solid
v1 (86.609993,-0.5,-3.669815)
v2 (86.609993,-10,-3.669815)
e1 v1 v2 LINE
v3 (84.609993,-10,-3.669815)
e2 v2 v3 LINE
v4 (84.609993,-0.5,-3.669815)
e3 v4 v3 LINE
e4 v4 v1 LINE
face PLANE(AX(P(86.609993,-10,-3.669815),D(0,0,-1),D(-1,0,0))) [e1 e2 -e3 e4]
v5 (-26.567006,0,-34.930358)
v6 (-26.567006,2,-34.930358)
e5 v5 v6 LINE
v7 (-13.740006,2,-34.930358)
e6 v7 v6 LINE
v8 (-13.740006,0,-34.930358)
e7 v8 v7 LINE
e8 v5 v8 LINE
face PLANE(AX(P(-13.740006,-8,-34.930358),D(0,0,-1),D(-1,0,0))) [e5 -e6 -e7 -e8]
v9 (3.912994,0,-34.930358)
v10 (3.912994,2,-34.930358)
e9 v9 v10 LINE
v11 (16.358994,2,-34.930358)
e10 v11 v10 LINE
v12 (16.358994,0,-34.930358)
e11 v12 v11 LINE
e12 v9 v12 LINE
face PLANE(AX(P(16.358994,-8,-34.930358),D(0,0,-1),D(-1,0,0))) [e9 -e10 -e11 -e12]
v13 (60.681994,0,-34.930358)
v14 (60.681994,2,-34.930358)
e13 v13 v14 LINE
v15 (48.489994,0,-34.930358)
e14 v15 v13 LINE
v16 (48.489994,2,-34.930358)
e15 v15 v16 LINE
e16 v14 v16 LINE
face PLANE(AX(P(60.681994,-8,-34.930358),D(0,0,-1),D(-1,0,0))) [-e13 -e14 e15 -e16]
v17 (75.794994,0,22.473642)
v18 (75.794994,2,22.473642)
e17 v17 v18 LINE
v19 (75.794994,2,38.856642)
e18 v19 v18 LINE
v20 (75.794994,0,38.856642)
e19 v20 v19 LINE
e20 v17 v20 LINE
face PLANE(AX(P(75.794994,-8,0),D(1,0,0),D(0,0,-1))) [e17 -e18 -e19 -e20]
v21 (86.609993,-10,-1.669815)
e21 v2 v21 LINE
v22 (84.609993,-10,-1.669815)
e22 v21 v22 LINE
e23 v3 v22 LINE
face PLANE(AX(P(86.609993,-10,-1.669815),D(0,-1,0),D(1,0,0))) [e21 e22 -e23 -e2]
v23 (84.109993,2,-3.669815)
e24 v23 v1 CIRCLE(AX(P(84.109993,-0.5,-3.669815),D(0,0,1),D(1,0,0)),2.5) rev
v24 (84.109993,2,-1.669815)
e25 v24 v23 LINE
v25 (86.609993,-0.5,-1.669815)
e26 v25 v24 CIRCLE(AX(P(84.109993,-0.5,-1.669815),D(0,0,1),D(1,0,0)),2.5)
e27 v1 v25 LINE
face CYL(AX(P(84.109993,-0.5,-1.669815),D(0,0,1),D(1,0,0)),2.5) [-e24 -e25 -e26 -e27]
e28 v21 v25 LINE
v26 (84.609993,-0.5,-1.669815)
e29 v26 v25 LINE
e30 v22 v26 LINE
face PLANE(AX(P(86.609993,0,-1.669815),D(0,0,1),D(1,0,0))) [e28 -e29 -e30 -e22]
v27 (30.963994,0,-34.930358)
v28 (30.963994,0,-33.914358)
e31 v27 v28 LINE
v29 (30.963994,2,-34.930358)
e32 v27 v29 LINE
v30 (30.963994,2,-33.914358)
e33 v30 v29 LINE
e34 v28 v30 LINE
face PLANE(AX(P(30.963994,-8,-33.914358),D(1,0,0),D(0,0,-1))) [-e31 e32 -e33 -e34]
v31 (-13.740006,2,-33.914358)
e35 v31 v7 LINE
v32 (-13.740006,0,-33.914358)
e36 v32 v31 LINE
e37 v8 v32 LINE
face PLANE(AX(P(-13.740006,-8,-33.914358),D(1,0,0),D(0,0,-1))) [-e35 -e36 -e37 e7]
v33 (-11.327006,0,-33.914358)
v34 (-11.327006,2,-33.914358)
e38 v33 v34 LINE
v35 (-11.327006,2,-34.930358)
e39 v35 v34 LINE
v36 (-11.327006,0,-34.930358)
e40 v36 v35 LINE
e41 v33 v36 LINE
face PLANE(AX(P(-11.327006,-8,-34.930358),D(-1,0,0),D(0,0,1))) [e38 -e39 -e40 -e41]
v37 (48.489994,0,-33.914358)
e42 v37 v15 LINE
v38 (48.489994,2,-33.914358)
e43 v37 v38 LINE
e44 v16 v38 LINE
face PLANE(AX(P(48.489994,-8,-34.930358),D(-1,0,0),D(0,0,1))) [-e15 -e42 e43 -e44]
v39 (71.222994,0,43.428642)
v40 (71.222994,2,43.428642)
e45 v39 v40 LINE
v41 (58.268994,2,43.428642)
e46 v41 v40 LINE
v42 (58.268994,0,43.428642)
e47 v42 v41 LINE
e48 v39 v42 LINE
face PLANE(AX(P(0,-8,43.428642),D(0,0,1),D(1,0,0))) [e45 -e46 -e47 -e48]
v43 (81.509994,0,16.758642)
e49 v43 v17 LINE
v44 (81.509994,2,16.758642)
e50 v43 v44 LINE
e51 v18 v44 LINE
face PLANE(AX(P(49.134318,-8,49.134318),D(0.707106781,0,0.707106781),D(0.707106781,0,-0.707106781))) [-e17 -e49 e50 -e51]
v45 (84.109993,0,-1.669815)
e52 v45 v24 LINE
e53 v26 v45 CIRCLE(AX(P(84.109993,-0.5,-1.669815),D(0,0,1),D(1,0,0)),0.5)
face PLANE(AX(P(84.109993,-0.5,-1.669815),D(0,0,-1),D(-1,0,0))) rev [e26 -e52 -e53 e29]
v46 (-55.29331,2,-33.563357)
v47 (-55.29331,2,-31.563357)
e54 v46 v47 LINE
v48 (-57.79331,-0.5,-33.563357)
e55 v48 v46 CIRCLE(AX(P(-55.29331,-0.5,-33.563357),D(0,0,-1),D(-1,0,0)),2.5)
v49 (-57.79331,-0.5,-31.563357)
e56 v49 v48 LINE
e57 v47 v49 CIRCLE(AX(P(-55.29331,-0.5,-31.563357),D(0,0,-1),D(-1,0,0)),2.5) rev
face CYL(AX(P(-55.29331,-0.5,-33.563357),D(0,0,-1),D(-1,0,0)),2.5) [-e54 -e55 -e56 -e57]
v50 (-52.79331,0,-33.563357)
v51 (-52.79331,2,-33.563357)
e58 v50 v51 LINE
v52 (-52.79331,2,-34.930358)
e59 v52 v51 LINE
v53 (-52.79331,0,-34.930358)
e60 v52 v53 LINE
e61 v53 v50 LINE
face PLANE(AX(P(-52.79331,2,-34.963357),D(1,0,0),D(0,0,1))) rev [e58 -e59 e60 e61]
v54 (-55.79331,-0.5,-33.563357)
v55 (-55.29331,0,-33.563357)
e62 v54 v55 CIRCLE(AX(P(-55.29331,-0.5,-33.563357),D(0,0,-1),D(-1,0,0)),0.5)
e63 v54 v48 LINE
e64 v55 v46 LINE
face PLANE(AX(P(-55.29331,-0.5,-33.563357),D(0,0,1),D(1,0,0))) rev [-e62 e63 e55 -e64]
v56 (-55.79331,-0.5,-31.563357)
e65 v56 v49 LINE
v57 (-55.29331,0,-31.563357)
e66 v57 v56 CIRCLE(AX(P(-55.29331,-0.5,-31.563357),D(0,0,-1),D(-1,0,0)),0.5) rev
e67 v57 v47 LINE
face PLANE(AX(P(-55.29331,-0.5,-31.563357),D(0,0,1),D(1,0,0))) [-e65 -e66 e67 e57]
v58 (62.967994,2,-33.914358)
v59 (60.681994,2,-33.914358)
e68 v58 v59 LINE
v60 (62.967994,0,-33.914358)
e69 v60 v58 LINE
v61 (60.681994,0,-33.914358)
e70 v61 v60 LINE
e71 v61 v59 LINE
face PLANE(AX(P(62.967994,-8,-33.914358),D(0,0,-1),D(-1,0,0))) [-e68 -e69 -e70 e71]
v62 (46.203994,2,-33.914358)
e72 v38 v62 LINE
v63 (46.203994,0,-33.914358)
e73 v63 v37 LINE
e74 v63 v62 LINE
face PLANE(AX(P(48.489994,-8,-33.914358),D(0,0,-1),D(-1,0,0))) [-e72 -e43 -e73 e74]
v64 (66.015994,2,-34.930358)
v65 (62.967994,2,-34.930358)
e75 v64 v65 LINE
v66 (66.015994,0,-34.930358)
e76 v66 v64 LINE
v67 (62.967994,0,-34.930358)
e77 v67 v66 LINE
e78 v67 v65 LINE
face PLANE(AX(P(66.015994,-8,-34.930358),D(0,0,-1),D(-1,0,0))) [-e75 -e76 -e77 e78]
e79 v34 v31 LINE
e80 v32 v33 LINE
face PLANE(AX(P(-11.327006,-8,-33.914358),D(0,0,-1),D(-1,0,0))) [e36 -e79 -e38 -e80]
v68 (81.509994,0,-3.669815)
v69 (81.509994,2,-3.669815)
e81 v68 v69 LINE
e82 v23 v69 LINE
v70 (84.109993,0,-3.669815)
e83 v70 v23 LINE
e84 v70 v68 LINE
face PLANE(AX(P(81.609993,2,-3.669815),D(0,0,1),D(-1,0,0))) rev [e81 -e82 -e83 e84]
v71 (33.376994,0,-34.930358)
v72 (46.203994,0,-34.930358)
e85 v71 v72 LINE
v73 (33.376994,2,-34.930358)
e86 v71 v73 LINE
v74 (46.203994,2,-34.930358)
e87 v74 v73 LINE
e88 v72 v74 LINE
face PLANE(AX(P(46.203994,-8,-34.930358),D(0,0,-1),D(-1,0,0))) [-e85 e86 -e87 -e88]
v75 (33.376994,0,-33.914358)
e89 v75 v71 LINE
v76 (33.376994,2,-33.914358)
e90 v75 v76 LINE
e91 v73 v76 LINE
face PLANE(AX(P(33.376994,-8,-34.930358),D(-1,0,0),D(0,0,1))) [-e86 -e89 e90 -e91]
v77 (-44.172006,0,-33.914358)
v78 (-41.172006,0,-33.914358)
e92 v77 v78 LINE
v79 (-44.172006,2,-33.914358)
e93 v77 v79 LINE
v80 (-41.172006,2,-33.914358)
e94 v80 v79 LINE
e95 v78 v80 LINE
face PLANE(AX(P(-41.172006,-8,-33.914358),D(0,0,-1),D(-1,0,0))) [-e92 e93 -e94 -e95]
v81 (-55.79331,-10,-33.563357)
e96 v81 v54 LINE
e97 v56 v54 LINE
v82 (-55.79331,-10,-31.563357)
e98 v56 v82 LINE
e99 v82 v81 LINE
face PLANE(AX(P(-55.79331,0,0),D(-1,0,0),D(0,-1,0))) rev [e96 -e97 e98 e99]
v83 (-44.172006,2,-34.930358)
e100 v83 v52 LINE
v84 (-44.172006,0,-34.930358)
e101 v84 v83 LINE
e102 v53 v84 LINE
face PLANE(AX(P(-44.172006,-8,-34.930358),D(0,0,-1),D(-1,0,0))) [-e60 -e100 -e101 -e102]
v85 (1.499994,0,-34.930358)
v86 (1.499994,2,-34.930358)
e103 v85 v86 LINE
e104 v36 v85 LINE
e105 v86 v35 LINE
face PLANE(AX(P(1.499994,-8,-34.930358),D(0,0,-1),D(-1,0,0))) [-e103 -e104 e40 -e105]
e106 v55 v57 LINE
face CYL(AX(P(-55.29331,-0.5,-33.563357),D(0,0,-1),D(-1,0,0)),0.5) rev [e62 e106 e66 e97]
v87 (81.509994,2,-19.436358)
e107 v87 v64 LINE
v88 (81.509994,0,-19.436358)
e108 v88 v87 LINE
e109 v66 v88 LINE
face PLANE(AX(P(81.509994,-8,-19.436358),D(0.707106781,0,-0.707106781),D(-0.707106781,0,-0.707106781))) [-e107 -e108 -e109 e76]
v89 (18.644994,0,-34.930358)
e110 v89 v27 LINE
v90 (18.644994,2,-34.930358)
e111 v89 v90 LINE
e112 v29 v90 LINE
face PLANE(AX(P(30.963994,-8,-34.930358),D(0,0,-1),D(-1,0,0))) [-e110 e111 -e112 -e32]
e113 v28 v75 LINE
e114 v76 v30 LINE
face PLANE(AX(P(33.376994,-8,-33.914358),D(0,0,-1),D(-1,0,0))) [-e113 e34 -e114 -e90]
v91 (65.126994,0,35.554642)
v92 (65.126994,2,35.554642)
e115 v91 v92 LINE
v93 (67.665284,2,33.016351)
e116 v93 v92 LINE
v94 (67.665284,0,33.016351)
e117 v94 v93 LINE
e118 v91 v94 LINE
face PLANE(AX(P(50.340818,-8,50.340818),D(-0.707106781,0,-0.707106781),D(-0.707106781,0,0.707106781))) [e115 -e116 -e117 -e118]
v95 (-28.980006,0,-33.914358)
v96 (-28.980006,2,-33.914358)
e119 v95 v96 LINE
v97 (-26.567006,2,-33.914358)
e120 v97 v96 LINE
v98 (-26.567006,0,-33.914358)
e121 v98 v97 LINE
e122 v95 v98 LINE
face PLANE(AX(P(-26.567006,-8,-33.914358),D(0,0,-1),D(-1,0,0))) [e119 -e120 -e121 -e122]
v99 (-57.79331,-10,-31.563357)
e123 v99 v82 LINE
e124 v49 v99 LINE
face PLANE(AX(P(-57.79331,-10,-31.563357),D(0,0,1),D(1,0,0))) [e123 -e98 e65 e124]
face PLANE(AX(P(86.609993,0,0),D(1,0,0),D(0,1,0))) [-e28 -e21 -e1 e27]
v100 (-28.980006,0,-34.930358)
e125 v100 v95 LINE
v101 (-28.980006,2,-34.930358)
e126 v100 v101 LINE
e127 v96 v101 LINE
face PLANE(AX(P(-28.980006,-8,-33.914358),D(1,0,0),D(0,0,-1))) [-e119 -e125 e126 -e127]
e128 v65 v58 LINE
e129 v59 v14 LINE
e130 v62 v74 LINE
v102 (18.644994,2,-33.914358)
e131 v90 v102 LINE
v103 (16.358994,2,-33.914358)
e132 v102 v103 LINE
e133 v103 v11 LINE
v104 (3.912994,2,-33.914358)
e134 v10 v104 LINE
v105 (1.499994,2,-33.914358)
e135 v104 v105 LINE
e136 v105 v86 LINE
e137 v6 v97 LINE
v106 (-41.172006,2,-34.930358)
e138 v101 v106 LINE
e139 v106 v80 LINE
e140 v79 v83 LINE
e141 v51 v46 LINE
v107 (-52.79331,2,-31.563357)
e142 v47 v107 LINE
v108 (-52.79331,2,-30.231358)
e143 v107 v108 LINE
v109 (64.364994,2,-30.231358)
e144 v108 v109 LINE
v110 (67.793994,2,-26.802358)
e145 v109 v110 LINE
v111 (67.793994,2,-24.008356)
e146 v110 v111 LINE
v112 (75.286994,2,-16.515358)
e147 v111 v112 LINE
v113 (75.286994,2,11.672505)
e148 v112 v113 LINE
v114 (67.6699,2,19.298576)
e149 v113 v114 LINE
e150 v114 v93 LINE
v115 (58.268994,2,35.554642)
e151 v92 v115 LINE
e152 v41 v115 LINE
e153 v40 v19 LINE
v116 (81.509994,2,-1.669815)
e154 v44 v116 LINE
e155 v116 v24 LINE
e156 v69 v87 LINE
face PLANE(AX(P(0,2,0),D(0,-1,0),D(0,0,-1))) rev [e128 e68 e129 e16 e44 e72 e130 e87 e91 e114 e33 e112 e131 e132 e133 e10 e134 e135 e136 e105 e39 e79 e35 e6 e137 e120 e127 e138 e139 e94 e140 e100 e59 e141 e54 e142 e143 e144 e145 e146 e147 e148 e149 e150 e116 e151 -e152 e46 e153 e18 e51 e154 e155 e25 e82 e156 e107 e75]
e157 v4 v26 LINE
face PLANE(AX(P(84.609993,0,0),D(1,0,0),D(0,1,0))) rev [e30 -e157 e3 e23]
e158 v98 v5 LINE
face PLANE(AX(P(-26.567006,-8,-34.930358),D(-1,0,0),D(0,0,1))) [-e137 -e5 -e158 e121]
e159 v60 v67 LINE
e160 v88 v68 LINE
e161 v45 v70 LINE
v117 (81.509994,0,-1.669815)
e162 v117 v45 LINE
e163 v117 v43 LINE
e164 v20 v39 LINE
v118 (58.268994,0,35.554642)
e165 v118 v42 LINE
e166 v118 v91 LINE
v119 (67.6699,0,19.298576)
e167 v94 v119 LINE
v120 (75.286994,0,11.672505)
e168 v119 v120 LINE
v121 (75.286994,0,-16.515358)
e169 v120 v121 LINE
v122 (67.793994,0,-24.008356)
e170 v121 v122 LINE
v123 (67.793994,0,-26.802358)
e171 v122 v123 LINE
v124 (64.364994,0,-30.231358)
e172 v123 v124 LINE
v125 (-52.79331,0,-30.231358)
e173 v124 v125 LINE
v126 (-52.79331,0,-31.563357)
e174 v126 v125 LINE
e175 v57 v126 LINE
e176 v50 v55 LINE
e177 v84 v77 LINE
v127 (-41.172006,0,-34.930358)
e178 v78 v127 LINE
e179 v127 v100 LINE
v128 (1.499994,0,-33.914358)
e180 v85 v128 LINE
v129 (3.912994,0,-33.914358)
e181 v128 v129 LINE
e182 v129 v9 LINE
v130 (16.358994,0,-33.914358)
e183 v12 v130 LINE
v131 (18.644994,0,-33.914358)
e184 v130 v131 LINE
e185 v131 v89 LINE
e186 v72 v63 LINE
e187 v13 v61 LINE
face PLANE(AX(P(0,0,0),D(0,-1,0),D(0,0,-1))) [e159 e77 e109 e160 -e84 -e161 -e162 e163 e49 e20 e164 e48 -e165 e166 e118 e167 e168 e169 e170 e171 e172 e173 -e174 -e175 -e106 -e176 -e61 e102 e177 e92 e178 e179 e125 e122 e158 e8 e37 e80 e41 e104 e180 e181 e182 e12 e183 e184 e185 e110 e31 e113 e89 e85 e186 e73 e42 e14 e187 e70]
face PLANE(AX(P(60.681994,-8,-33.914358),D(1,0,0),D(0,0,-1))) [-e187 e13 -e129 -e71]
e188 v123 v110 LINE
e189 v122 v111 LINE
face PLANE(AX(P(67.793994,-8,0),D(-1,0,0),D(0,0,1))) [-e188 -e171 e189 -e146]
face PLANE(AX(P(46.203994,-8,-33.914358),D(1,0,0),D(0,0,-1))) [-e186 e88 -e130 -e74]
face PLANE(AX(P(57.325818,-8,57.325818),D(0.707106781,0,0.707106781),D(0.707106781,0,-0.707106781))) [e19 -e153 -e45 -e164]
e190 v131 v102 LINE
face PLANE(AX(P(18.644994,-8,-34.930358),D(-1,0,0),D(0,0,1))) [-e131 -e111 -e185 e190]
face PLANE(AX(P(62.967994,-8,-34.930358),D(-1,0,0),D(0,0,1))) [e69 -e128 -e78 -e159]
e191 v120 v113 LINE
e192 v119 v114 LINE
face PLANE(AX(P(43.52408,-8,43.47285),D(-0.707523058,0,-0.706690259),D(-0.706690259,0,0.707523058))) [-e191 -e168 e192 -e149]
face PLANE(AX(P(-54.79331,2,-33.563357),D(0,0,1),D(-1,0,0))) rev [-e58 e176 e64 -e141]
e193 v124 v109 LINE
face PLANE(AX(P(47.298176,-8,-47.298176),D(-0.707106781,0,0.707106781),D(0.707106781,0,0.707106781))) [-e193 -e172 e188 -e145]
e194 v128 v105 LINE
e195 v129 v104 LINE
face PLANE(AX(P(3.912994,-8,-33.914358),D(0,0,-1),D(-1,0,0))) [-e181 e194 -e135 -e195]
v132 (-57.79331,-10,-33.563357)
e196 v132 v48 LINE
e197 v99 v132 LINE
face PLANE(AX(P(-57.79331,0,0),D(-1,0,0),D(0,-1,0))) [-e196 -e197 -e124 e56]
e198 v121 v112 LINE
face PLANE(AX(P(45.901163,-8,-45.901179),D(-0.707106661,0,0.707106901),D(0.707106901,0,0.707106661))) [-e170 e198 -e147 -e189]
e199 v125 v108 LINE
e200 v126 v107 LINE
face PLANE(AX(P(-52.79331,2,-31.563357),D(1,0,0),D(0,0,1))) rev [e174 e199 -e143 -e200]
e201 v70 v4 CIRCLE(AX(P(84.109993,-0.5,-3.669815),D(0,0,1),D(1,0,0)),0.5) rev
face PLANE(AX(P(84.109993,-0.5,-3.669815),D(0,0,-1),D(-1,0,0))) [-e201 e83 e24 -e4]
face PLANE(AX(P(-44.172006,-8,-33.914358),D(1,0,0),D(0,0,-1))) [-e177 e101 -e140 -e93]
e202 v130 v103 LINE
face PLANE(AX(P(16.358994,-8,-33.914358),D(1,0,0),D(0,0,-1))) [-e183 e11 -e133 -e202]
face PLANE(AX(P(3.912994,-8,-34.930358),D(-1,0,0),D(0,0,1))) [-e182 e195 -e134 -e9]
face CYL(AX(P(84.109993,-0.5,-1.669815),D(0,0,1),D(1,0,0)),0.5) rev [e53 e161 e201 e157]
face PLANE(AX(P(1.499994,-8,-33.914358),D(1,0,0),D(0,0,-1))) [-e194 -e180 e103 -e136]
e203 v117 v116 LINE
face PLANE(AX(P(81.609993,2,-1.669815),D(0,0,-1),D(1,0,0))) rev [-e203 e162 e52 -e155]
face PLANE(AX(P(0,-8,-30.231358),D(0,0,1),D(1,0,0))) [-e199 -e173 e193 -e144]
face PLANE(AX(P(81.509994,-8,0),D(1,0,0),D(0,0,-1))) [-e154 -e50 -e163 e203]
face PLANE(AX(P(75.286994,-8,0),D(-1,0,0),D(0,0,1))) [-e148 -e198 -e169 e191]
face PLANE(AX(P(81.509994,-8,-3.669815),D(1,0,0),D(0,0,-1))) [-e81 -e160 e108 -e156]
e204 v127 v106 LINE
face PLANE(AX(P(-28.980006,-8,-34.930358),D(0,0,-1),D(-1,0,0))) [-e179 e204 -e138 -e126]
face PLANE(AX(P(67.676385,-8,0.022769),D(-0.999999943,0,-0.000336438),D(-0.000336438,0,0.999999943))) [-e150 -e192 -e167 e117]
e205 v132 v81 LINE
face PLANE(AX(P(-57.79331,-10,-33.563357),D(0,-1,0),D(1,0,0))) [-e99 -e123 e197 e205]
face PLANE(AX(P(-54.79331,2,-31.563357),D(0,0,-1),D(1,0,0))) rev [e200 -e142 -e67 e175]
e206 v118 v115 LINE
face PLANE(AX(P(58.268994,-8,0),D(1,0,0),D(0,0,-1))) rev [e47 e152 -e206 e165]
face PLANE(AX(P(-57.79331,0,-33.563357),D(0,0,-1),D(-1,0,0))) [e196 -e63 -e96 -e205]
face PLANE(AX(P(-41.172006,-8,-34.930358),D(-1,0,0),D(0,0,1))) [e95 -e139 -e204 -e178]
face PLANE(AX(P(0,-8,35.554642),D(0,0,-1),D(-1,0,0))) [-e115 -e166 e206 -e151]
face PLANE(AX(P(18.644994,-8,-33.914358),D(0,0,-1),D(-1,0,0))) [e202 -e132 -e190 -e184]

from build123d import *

# Parameters (mm, degrees)
BOSS_EXTRUDE1_DEPTH = 2
EDGE_FLANGE1_DEPTH  = 2
EDGE_FLANGE2_DEPTH  = 2
CUT_EXTRUDE3_DEPTH  = 10


# Sheet-metal steps are written as plain solids
with BuildPart() as part:
    # Sketch2 → Boss-Extrude1 (new body)
    with BuildSketch(Plane(origin=(0, 0, 0), x_dir=(1, 0, 0), z_dir=(0, 1, 0))):
        Polygon((81.609993248, 1.669814581), (81.609993248, -16.836643227), (75.909994488, -22.536641987), (75.909994488, -38.936642207), (70.009993588, -44.836643107), (58.109994528, -44.836643107), (58.109994528, -34.336641247), (63.809993288, -34.336641247), (67.509993508, -30.636641027), (67.509993508, -19.345596807), (75.109993548, -11.745596767), (75.109993548, 16.463358753), (67.709993108, 23.863356653), (67.709993108, 26.763358473), (64.309994828, 30.163356753), (-43.190006072, 30.163356753), (-52.793309772, 30.163356753), (-52.793309772, 31.563357033), (-54.793309772, 31.563357033), (-54.793309772, 33.563357033), (-52.793309772, 33.563357033), (-52.793309772, 34.963357313), (-43.190006072, 34.963357313), (66.209993568, 34.963357313), (81.609993248, 19.563357633), (81.609993248, 3.669814581), (83.609993248, 3.669814581), (83.609993248, 1.669814581), align=None)
    extrude(amount=BOSS_EXTRUDE1_DEPTH)

    # Edge-Flange1 section (across the edge) → Edge-Flange1 (add)
    with BuildSketch(Plane(origin=(-55.793309772, 0, -31.563357033), x_dir=(1, 0, 0), z_dir=(0, 0, -1))):
        with BuildLine():
            Line((-2, 0.5), (-2, 10))
            Line((-2, 10), (0, 10))
            Line((0, 10), (0, 0.5))
            ThreePointArc((0, 0.5), (0.146446609, 0.146446609), (0.5, 0))
            Line((0.5, 0), (1, 0))
            Line((1, 0), (1, -2))
            Line((1, -2), (0.5, -2))
            ThreePointArc((0.5, -2), (-1.267766953, -1.267766953), (-2, 0.5))
        make_face()
    extrude(amount=EDGE_FLANGE1_DEPTH)

    # Edge-Flange2 section (across the edge) → Edge-Flange2 (add)
    with BuildSketch(Plane(origin=(84.609993248, 0, -3.669814581), x_dir=(-1, 0, 0), z_dir=(0, 0, 1))):
        with BuildLine():
            Line((-2, 0.5), (-2, 10))
            Line((-2, 10), (0, 10))
            Line((0, 10), (0, 0.5))
            ThreePointArc((0, 0.5), (0.146446609, 0.146446609), (0.5, 0))
            Line((0.5, 0), (1, 0))
            Line((1, 0), (1, -2))
            Line((1, -2), (0.5, -2))
            ThreePointArc((0.5, -2), (-1.267766953, -1.267766953), (-2, 0.5))
        make_face()
    extrude(amount=EDGE_FLANGE2_DEPTH)

    # Sketch13 → Cut-Extrude3 (cut)
    with BuildSketch(Plane(origin=(0, 2, 0), x_dir=(1, 0, 0), z_dir=(0, 1, 0))):
        Polygon((64.364993832, 30.231358373), (-43.077006168, 30.231358373), (-52.793309772, 30.231358373), (-52.793309772, 30.163356753), (64.309994828, 30.163356753), (67.709993108, 26.763358473), (67.709993108, 23.863356653), (75.109993548, 16.463358753), (75.109993548, -11.745596767), (67.509993508, -19.345596807), (67.509993508, -30.636641027), (63.809993288, -34.336641247), (58.109994528, -34.336641247), (58.109994528, -44.836643107), (70.009993588, -44.836643107), (75.909994488, -38.936642207), (75.909994488, -22.536641987), (81.609993248, -16.836643227), (81.609993248, 1.669814581), (81.509993832, 1.669814581), (81.509993832, -16.758641627), (75.794993832, -22.473641627), (75.794993832, -38.856641627), (71.222993832, -43.428641627), (58.268993832, -43.428641627), (58.268993832, -35.554641627), (65.126993832, -35.554641627), (67.665284412, -33.016351047), (67.669899592, -19.298575587), (75.286993832, -11.672504987), (75.286993832, 16.515358373), (67.793993832, 24.008355833), (67.793993832, 26.802358373), align=None)
        Polygon((-52.793309772, 30.163356753), (-52.793309772, 30.231358373), (-53.09278865, 30.231358373), (-53.09278865, 29.122247983), (64.073173088, 29.122247983), (66.904295046, 26.802358373), (66.904295046, 23.685270997), (74.890508664, 15.670381273), (73.855495628, -9.951608799), (66.571415804, -17.811521066), (66.392045366, -24.291741654), (65.126993832, -32.125935595), (57.650093481, -33.249786732), (57.276841603, -46.73447534), (58.268993832, -46.73447534), (69.513593476, -46.73447534), (76.944541222, -41.148796497), (77.641700893, -23.890445583), (84.109993248, -17.212504202), (84.109993248, 1.669814581), (81.609993248, 1.669814581), (81.609993248, -16.836643227), (75.909994488, -22.536641987), (75.909994488, -38.936642207), (70.009993588, -44.836643107), (58.109994528, -44.836643107), (58.109994528, -34.336641247), (63.809993288, -34.336641247), (67.509993508, -30.636641027), (67.509993508, -19.345596807), (75.109993548, -11.745596767), (75.109993548, 16.463358753), (67.709993108, 23.863356653), (67.709993108, 26.763358473), (64.309994828, 30.163356753), align=None)
        Polygon((84.109993248, 19.032357692), (84.109993248, 3.669814581), (81.509993832, 3.669814581), (81.509993832, 19.436358373), (66.015993832, 34.930358373), (62.967993832, 34.930358373), (62.967993832, 33.914358373), (60.681993832, 33.914358373), (60.681993832, 34.930358373), (48.489993832, 34.930358373), (48.489993832, 33.914358373), (46.203993832, 33.914358373), (46.203993832, 34.930358373), (33.376993832, 34.930358373), (33.376993832, 33.914358373), (30.963993832, 33.914358373), (30.963993832, 34.930358373), (18.644993832, 34.930358373), (18.644993832, 33.914358373), (16.358993832, 33.914358373), (16.358993832, 34.930358373), (3.912993832, 34.930358373), (3.912993832, 33.914358373), (1.499993832, 33.914358373), (1.499993832, 34.930358373), (-11.327006168, 34.930358373), (-11.327006168, 33.914358373), (-13.740006168, 33.914358373), (-13.740006168, 34.930358373), (-26.567006168, 34.930358373), (-26.567006168, 33.914358373), (-28.980006168, 33.914358373), (-28.980006168, 34.930358373), (-41.172006168, 34.930358373), (-41.172006168, 33.914358373), (-44.172006168, 33.914358373), (-44.172006168, 34.930358373), (-54.307784522, 34.930358373), (-54.307784522, 35.697895733), (66.904295046, 35.697895733), align=None)
    extrude(amount=-CUT_EXTRUDE3_DEPTH, mode=Mode.SUBTRACT)


solid = part.part
